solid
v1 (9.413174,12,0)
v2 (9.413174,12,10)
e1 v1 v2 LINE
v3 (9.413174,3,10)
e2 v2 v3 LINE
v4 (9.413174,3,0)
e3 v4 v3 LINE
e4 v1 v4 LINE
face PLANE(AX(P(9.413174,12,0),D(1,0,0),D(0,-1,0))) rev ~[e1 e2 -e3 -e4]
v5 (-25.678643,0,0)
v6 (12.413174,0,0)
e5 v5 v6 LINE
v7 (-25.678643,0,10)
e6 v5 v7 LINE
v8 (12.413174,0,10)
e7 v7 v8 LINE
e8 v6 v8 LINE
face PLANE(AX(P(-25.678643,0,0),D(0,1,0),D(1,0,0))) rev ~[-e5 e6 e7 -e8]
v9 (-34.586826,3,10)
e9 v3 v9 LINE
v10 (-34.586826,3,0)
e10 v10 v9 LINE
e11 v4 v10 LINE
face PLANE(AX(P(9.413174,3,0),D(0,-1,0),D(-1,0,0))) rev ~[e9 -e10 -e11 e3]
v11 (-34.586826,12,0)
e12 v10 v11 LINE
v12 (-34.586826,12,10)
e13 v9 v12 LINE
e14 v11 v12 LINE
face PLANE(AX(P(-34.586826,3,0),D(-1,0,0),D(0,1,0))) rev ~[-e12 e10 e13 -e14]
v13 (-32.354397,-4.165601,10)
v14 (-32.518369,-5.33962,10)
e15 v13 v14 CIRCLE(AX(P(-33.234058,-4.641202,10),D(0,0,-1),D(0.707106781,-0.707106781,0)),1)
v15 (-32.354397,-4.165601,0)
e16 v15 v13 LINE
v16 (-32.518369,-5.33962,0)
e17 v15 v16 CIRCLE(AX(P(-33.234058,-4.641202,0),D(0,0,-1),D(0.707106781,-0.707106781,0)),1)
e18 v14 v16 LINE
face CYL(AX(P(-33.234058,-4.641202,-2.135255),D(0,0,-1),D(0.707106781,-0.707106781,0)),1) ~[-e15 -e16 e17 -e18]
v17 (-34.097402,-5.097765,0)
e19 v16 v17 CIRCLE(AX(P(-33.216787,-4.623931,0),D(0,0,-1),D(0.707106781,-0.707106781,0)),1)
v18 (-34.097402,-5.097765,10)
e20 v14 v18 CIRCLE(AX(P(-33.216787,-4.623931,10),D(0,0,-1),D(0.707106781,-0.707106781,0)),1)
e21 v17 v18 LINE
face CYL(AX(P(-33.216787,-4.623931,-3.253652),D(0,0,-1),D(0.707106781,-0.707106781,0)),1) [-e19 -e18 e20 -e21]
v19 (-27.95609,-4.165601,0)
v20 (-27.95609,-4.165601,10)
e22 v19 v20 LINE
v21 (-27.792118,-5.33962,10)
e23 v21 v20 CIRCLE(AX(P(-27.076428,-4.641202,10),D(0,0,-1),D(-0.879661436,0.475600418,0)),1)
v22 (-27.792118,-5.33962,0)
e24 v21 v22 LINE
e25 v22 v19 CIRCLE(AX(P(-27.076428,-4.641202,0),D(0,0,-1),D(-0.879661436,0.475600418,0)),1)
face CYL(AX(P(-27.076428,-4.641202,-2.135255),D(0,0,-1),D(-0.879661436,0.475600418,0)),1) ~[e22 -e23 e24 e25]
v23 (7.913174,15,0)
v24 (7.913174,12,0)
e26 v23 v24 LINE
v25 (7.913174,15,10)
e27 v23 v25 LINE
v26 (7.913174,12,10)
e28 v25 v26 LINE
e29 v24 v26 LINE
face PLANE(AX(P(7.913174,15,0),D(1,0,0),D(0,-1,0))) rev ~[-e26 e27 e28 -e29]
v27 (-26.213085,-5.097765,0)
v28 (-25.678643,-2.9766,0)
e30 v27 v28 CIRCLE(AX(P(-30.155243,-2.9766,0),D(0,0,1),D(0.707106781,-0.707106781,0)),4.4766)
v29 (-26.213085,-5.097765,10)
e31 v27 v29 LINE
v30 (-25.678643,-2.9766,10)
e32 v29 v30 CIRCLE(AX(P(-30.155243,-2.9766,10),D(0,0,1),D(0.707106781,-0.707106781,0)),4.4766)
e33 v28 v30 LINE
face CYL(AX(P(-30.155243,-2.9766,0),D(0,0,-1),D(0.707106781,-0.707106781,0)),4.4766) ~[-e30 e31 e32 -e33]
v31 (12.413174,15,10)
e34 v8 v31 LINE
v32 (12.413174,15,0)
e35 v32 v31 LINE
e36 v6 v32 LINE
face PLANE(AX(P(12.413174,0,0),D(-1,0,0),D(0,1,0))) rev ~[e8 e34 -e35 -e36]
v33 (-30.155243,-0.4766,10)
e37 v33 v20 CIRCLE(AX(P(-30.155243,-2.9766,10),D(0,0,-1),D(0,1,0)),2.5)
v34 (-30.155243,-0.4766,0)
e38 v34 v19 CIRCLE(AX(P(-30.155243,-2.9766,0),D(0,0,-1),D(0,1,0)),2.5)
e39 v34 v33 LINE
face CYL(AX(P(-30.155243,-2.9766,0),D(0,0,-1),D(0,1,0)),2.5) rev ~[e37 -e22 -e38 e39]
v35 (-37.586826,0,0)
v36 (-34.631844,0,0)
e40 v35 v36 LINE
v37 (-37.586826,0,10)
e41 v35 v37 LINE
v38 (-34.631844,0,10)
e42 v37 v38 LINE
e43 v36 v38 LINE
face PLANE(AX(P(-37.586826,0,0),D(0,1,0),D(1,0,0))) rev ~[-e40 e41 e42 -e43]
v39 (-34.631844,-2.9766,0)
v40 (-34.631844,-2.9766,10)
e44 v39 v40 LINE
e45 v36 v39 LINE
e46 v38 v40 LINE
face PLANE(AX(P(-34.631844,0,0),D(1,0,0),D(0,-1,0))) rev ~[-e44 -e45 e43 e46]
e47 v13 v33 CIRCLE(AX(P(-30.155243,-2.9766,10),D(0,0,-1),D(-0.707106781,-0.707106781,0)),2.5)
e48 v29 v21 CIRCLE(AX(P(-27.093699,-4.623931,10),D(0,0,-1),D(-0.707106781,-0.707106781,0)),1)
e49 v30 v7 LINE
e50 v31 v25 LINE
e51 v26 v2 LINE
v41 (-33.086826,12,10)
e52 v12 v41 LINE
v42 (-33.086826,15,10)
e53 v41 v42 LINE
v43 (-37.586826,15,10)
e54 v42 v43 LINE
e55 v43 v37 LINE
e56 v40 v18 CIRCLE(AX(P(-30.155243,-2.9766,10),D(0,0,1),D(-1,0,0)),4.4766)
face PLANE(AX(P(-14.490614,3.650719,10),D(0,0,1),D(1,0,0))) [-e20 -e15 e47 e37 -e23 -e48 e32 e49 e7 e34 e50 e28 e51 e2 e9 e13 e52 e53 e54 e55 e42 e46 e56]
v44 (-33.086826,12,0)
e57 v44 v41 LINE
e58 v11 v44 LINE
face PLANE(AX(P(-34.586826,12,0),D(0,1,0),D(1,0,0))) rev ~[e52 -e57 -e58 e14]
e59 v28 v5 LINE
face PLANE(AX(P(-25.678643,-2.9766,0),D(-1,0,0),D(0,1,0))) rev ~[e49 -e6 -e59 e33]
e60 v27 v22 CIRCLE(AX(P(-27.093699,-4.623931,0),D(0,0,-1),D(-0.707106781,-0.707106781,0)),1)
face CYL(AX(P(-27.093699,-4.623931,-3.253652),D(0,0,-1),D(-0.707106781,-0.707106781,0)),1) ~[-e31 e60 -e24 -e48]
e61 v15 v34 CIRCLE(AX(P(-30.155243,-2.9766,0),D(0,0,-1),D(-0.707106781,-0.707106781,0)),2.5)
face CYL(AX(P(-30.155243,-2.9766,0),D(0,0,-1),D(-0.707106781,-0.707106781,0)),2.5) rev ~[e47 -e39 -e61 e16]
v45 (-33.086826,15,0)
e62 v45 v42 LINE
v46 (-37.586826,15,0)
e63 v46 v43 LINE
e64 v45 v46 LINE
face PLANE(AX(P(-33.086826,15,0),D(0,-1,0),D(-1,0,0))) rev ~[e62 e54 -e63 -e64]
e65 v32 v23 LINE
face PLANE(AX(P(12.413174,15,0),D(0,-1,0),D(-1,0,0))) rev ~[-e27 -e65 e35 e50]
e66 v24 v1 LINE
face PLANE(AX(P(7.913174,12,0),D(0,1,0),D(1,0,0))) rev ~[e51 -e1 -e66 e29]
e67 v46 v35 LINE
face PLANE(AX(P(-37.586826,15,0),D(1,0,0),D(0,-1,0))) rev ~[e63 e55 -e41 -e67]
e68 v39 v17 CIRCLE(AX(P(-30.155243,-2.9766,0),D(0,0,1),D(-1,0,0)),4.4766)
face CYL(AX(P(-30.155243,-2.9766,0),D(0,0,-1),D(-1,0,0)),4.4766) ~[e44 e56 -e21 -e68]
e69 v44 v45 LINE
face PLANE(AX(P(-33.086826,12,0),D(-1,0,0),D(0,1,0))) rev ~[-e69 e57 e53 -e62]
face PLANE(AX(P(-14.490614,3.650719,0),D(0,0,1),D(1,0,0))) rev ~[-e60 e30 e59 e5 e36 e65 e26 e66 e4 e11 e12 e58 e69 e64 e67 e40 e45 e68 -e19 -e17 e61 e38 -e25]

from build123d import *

# Parameters (mm, degrees)
F1_DEPTH    = 10
F2_T1_DEPTH = 16.5073043021
F2_T3_DEPTH = 14.2705098312


# Not quite as in the source:
# - a fillet or chamfer that OpenCascade refuses, or shapes differently, is made with other operations: its cross-section is extruded or revolved along the edge and cut away or added


with BuildPart() as f1:
    # F0 (on Top) → F1 (new body)
    with BuildSketch(Plane.XY):
        with BuildLine():
            Line((-25.6786430255, 0), (12.4131741374, 0))
            Line((12.4131741374, 0), (12.4131741374, 15))
            Line((12.4131741374, 15), (7.9131741374, 15))
            Line((7.9131741374, 15), (7.9131741374, 12))
            Line((7.9131741374, 12), (9.4131741374, 12))
            Line((9.4131741374, 12), (9.4131741374, 3))
            Line((9.4131741374, 3), (-34.5868258626, 3))
            Line((-34.5868258626, 3), (-34.5868258626, 12))
            Line((-34.5868258626, 12), (-33.0868258626, 12))
            Line((-33.0868258626, 12), (-33.0868258626, 15))
            Line((-33.0868258626, 15), (-37.5868258626, 15))
            Line((-37.5868258626, 15), (-37.5868258626, 0))
            Line((-37.5868258626, 0), (-34.6318436787, 0))
            Line((-34.6318436787, 0), (-34.6318436787, -2.9766003136))
            ThreePointArc((-34.6318436787, -2.9766003136), (-34.291082769, -4.6897210919), (-33.3206777997, -6.1420347612))
            Line((-33.3206777997, -6.1420347612), (-31.923010305, -4.7443672665))
            ThreePointArc((-31.923010305, -4.7443672665), (-32.4649421833, -2.0198917326), (-30.1552433521, -0.4766003136))
            ThreePointArc((-30.1552433521, -0.4766003136), (-27.8455445208, -2.0198917326), (-28.3874763991, -4.7443672665))
            Line((-28.3874763991, -4.7443672665), (-26.9898089045, -6.1420347612))
            ThreePointArc((-26.9898089045, -6.1420347612), (-26.0194039351, -4.6897210919), (-25.6786430255, -2.9766003136))
            Line((-25.6786430255, -2.9766003136), (-25.6786430255, 0))
        make_face()
    extrude(amount=F1_DEPTH)

    # F2: fillet of radius 1 on 4 edges, made by hand

    # F2_s2 → F2_t1 (cut)
    with BuildSketch(Plane.XY.offset(-3.253652151)):
        with BuildLine():
            ThreePointArc((-32.5096806342, -5.3310375957), (-33.3621500528, -5.6133092576), (-34.0974017442, -5.0977645446))
            ThreePointArc((-34.0974017442, -5.0977645446), (-33.7471918574, -5.6482770191), (-33.3206777997, -6.1420347612))
            Line((-33.3206777997, -6.1420347612), (-32.5096806342, -5.3310375957))
        make_face()
        with BuildLine():
            ThreePointArc((-27.8008060699, -5.3310375957), (-26.9483366513, -5.6133092576), (-26.2130849599, -5.0977645446))
            ThreePointArc((-26.2130849599, -5.0977645446), (-26.5632948467, -5.6482770191), (-26.9898089045, -6.1420347612))
            Line((-26.9898089045, -6.1420347612), (-27.8008060699, -5.3310375957))
        make_face()
    extrude(amount=F2_T1_DEPTH, mode=Mode.SUBTRACT)

    # F2_s4 → F2_t3 (cut)
    with BuildSketch(Plane.XY.offset(-2.1352549156)):
        with BuildLine():
            ThreePointArc((-32.5269515972, -5.3483085587), (-32.2445345415, -4.7855713596), (-32.3543969423, -4.1656013592))
            ThreePointArc((-32.3543969423, -4.1656013592), (-32.1597026664, -4.4706360752), (-31.923010305, -4.7443672665))
            Line((-31.923010305, -4.7443672665), (-32.5269515972, -5.3483085587))
        make_face()
        with BuildLine():
            ThreePointArc((-27.9560897618, -4.1656013592), (-28.0659521626, -4.7855713596), (-27.7835351069, -5.3483085587))
            Line((-27.7835351069, -5.3483085587), (-28.3874763991, -4.7443672665))
            ThreePointArc((-28.3874763991, -4.7443672665), (-28.1507840377, -4.4706360752), (-27.9560897618, -4.1656013592))
        make_face()
    extrude(amount=F2_T3_DEPTH, mode=Mode.SUBTRACT)


solid = f1.part
